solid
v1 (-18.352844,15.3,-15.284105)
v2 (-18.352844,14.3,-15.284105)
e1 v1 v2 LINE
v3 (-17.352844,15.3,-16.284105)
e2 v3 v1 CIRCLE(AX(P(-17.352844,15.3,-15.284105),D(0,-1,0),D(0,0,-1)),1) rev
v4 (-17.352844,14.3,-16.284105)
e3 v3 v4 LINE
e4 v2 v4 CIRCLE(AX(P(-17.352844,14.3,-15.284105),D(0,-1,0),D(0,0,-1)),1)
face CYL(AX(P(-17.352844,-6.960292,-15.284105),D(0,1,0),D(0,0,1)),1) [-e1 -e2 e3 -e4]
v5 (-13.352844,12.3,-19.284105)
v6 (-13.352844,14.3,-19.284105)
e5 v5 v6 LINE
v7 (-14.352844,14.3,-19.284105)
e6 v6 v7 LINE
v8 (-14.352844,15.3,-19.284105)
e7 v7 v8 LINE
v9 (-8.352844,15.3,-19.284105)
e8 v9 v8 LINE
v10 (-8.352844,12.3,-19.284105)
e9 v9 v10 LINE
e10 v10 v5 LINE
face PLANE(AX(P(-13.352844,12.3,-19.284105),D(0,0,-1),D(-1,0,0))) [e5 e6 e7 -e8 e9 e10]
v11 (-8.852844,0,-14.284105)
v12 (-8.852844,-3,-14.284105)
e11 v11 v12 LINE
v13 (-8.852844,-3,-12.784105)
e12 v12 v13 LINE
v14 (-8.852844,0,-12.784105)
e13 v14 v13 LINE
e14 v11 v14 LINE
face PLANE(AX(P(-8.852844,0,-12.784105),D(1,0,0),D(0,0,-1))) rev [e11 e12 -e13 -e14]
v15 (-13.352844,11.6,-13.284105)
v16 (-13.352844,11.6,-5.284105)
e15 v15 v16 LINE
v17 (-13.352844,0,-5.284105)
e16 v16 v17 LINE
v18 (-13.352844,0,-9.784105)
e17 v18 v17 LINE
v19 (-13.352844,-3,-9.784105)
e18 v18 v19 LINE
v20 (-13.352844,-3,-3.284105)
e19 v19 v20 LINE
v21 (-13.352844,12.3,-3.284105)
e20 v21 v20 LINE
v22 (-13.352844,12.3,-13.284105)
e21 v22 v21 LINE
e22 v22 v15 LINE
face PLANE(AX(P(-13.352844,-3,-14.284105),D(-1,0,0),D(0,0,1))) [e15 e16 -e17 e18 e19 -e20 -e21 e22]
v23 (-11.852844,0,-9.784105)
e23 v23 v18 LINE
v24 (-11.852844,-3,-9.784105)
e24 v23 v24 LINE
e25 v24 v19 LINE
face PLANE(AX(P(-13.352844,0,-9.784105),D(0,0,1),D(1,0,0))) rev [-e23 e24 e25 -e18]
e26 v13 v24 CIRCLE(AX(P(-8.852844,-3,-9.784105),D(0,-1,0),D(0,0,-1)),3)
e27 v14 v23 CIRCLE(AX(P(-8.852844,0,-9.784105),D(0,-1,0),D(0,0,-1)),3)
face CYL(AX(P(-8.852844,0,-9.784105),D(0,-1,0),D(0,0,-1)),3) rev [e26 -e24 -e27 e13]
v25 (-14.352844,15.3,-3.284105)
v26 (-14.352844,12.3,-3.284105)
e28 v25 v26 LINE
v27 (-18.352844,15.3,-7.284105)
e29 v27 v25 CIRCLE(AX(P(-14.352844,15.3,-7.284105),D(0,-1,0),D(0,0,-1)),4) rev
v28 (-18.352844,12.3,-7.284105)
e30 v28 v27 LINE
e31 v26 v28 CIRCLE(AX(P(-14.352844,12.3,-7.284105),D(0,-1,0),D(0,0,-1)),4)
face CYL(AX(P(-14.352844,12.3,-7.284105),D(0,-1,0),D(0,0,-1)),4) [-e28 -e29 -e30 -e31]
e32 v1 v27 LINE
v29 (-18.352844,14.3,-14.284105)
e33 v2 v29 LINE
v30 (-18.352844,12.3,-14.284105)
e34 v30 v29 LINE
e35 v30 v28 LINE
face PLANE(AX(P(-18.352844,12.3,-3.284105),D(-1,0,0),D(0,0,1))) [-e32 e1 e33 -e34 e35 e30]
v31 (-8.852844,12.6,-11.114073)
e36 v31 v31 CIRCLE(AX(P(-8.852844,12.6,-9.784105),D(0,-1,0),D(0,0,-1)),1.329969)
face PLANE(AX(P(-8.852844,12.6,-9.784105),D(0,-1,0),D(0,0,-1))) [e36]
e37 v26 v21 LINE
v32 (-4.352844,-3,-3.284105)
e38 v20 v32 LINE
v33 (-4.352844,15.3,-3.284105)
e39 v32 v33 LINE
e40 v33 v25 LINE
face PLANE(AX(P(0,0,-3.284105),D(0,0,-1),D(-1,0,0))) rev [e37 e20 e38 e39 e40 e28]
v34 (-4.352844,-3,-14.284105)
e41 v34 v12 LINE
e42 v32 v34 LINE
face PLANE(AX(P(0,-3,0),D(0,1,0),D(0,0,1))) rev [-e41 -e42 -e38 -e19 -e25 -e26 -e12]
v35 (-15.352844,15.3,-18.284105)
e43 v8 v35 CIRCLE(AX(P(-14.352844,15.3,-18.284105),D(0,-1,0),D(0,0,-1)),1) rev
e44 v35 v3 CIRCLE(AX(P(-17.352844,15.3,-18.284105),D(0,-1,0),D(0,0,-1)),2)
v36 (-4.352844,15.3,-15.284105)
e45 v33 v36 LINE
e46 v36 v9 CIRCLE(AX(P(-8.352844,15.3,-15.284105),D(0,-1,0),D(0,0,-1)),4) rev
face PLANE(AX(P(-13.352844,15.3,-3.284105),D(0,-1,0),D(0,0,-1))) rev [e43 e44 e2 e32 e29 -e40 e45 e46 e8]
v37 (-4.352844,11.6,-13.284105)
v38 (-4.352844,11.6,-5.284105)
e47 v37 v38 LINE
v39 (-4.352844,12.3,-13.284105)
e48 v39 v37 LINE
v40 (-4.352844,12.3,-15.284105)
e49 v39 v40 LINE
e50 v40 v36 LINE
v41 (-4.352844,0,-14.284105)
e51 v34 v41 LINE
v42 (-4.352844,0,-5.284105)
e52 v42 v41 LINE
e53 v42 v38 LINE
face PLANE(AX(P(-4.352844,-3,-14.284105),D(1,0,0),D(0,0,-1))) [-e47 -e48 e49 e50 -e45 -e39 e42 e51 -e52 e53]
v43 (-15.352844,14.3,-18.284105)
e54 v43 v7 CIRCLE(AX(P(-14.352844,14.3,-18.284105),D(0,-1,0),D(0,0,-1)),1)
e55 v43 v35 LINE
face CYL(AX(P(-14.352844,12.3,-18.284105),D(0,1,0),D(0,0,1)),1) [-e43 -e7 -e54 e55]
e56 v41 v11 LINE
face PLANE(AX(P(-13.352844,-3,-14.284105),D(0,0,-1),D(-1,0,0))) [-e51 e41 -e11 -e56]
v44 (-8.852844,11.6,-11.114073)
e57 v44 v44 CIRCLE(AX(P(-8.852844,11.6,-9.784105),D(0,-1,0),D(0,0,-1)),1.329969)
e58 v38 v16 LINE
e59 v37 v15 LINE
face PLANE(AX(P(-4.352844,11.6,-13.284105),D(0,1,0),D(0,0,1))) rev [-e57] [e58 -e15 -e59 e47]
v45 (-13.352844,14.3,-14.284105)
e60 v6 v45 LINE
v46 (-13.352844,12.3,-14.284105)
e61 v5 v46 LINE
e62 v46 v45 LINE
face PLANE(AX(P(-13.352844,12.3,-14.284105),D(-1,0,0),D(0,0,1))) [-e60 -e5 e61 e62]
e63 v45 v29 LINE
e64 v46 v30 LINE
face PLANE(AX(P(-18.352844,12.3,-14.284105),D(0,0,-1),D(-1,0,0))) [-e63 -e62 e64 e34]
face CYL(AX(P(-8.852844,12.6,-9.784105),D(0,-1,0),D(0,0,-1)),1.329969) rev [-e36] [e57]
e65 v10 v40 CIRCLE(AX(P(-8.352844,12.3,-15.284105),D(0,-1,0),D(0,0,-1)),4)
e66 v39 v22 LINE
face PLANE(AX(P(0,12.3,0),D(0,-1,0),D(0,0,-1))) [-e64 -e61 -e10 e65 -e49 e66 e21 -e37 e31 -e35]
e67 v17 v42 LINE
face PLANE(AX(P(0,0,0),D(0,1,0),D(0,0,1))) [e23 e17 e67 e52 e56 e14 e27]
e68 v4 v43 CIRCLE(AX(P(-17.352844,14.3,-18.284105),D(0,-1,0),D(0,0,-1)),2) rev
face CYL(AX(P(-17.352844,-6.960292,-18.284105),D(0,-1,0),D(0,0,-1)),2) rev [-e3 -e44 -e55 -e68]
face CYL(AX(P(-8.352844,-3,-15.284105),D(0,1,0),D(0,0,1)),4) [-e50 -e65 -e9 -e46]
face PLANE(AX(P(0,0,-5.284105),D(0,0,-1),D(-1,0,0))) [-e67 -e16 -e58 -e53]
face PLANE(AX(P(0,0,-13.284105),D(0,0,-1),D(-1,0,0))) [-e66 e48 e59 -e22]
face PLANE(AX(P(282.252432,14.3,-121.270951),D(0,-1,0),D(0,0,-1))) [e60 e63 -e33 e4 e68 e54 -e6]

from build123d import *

# Parameters (mm, degrees)
ESQUISSE1_W             = 9
ESQUISSE1_H             = 9
BOSS_EXTRU_1_DEPTH      = 3
ENL_V_MAT_EXTRU_1_DEPTH = 20.782165931
ESQUISSE3_W             = 9
ESQUISSE3_H             = 18.3
BOSS_EXTRU_3_DEPTH      = 2
ESQUISSE4_W             = 9
ESQUISSE4_H             = 3.7
BOSS_EXTRU_4_DEPTH      = 8
BOSS_EXTRU_6_DEPTH      = 3
BOSS_EXTRU_8_DEPTH      = 1
CONG_2_R                = 4
CONG_3_R                = 2
ESQUISSE7_R             = 1.329968568
ENL_V_MAT_EXTRU_2_DEPTH = 1
CONG_4_R                = 1


with BuildPart() as part:
    # Esquisse1 → Boss.-Extru.1 (new body)
    with BuildSketch(Plane(origin=(0, 0, 0), x_dir=(1, 0, 0), z_dir=(0, 1, 0))):
        with Locations((-8.852843945, 9.784104714)):
            Rectangle(ESQUISSE1_W, ESQUISSE1_H)
    extrude(amount=-BOSS_EXTRU_1_DEPTH)

    # Esquisse2 → Enlèv. mat.-Extru.1 (cut, through all)
    with BuildSketch(Plane.XZ.offset(3)):
        with BuildLine():
            Line((-8.852843945, -12.784104714), (-8.852843945, -14.284104714))
            Line((-8.852843945, -14.284104714), (-13.352843945, -14.284104714))
            Line((-13.352843945, -14.284104714), (-13.352843945, -9.784104714))
            Line((-13.352843945, -9.784104714), (-11.852843945, -9.784104714))
            ThreePointArc((-11.852843945, -9.784104714), (-6.731523602, -7.66278437), (-8.852843945, -12.784104714))
        make_face()
    extrude(amount=-ENL_V_MAT_EXTRU_1_DEPTH, mode=Mode.SUBTRACT)

    # Esquisse3 → Boss.-Extru.3 (add)
    with BuildSketch(Plane.XY.offset(-5.284104714)):
        with Locations((-8.852843945, 6.15)):
            Rectangle(ESQUISSE3_W, ESQUISSE3_H)
    extrude(amount=BOSS_EXTRU_3_DEPTH)

    # Esquisse4 → Boss.-Extru.4 (add)
    with BuildSketch(Plane(origin=(0, 0, -5.284104714), x_dir=(-1, 0, 0), z_dir=(0, 0, -1))):
        with Locations((8.852843945, 13.45)):
            Rectangle(ESQUISSE4_W, ESQUISSE4_H)
    extrude(amount=BOSS_EXTRU_4_DEPTH)

    # Esquisse8 → Boss.-Extru.6 (add)
    with BuildSketch(Plane(origin=(0, 15.3, 0), x_dir=(1, 0, 0), z_dir=(0, 1, 0))):
        Polygon((-18.352843945, 3.284104714), (-4.352843945, 3.284104714), (-4.352843945, 19.284104714), (-13.352843945, 19.284104714), (-13.352843945, 14.284104714), (-18.352843945, 14.284104714), align=None)
    extrude(amount=-BOSS_EXTRU_6_DEPTH)

    # Esquisse9 → Boss.-Extru.8 (add)
    with BuildSketch(Plane(origin=(0, 15.3, 0), x_dir=(1, 0, 0), z_dir=(0, 1, 0))):
        Polygon((-18.352843945, 16.284104714), (-18.352843945, 3.284104714), (-4.352843945, 3.284104714), (-4.352843945, 19.284104714), (-15.352843945, 19.284104714), (-15.352843945, 16.284104714), align=None)
    extrude(amount=-BOSS_EXTRU_8_DEPTH)

    # Congé2
    cong_2_edges = [part.edges().sort_by_distance(p)[0] for p in [
        (-18.352843945, 13.8, -3.284104714),
        (-4.352843945, 13.8, -19.284104714),
    ]]
    fillet(cong_2_edges, radius=CONG_2_R)

    # Congé3
    cong_3_edges = [part.edges().sort_by_distance(p)[0] for p in [
        (-15.352843945, 14.8, -16.284104714),
    ]]
    fillet(cong_3_edges, radius=CONG_3_R)

    # Esquisse7 → Enlèv. mat.-Extru.2 (cut)
    with BuildSketch(Plane.XZ.offset(-11.6)):
        with Locations(Location((-8.852843945, -9.784104714, 0), (0, 0, 270))):
            Circle(ESQUISSE7_R)
    extrude(amount=-ENL_V_MAT_EXTRU_2_DEPTH, mode=Mode.SUBTRACT)

    # Congé4
    cong_4_edges = [part.edges().sort_by_distance(p)[0] for p in [
        (-15.352843945, 14.8, -19.284104714),
        (-18.352843945, 14.8, -16.284104714),
    ]]
    fillet(cong_4_edges, radius=CONG_4_R - 0.0001)  # a hair under: the kernel refuses the full size


solid = part.part
